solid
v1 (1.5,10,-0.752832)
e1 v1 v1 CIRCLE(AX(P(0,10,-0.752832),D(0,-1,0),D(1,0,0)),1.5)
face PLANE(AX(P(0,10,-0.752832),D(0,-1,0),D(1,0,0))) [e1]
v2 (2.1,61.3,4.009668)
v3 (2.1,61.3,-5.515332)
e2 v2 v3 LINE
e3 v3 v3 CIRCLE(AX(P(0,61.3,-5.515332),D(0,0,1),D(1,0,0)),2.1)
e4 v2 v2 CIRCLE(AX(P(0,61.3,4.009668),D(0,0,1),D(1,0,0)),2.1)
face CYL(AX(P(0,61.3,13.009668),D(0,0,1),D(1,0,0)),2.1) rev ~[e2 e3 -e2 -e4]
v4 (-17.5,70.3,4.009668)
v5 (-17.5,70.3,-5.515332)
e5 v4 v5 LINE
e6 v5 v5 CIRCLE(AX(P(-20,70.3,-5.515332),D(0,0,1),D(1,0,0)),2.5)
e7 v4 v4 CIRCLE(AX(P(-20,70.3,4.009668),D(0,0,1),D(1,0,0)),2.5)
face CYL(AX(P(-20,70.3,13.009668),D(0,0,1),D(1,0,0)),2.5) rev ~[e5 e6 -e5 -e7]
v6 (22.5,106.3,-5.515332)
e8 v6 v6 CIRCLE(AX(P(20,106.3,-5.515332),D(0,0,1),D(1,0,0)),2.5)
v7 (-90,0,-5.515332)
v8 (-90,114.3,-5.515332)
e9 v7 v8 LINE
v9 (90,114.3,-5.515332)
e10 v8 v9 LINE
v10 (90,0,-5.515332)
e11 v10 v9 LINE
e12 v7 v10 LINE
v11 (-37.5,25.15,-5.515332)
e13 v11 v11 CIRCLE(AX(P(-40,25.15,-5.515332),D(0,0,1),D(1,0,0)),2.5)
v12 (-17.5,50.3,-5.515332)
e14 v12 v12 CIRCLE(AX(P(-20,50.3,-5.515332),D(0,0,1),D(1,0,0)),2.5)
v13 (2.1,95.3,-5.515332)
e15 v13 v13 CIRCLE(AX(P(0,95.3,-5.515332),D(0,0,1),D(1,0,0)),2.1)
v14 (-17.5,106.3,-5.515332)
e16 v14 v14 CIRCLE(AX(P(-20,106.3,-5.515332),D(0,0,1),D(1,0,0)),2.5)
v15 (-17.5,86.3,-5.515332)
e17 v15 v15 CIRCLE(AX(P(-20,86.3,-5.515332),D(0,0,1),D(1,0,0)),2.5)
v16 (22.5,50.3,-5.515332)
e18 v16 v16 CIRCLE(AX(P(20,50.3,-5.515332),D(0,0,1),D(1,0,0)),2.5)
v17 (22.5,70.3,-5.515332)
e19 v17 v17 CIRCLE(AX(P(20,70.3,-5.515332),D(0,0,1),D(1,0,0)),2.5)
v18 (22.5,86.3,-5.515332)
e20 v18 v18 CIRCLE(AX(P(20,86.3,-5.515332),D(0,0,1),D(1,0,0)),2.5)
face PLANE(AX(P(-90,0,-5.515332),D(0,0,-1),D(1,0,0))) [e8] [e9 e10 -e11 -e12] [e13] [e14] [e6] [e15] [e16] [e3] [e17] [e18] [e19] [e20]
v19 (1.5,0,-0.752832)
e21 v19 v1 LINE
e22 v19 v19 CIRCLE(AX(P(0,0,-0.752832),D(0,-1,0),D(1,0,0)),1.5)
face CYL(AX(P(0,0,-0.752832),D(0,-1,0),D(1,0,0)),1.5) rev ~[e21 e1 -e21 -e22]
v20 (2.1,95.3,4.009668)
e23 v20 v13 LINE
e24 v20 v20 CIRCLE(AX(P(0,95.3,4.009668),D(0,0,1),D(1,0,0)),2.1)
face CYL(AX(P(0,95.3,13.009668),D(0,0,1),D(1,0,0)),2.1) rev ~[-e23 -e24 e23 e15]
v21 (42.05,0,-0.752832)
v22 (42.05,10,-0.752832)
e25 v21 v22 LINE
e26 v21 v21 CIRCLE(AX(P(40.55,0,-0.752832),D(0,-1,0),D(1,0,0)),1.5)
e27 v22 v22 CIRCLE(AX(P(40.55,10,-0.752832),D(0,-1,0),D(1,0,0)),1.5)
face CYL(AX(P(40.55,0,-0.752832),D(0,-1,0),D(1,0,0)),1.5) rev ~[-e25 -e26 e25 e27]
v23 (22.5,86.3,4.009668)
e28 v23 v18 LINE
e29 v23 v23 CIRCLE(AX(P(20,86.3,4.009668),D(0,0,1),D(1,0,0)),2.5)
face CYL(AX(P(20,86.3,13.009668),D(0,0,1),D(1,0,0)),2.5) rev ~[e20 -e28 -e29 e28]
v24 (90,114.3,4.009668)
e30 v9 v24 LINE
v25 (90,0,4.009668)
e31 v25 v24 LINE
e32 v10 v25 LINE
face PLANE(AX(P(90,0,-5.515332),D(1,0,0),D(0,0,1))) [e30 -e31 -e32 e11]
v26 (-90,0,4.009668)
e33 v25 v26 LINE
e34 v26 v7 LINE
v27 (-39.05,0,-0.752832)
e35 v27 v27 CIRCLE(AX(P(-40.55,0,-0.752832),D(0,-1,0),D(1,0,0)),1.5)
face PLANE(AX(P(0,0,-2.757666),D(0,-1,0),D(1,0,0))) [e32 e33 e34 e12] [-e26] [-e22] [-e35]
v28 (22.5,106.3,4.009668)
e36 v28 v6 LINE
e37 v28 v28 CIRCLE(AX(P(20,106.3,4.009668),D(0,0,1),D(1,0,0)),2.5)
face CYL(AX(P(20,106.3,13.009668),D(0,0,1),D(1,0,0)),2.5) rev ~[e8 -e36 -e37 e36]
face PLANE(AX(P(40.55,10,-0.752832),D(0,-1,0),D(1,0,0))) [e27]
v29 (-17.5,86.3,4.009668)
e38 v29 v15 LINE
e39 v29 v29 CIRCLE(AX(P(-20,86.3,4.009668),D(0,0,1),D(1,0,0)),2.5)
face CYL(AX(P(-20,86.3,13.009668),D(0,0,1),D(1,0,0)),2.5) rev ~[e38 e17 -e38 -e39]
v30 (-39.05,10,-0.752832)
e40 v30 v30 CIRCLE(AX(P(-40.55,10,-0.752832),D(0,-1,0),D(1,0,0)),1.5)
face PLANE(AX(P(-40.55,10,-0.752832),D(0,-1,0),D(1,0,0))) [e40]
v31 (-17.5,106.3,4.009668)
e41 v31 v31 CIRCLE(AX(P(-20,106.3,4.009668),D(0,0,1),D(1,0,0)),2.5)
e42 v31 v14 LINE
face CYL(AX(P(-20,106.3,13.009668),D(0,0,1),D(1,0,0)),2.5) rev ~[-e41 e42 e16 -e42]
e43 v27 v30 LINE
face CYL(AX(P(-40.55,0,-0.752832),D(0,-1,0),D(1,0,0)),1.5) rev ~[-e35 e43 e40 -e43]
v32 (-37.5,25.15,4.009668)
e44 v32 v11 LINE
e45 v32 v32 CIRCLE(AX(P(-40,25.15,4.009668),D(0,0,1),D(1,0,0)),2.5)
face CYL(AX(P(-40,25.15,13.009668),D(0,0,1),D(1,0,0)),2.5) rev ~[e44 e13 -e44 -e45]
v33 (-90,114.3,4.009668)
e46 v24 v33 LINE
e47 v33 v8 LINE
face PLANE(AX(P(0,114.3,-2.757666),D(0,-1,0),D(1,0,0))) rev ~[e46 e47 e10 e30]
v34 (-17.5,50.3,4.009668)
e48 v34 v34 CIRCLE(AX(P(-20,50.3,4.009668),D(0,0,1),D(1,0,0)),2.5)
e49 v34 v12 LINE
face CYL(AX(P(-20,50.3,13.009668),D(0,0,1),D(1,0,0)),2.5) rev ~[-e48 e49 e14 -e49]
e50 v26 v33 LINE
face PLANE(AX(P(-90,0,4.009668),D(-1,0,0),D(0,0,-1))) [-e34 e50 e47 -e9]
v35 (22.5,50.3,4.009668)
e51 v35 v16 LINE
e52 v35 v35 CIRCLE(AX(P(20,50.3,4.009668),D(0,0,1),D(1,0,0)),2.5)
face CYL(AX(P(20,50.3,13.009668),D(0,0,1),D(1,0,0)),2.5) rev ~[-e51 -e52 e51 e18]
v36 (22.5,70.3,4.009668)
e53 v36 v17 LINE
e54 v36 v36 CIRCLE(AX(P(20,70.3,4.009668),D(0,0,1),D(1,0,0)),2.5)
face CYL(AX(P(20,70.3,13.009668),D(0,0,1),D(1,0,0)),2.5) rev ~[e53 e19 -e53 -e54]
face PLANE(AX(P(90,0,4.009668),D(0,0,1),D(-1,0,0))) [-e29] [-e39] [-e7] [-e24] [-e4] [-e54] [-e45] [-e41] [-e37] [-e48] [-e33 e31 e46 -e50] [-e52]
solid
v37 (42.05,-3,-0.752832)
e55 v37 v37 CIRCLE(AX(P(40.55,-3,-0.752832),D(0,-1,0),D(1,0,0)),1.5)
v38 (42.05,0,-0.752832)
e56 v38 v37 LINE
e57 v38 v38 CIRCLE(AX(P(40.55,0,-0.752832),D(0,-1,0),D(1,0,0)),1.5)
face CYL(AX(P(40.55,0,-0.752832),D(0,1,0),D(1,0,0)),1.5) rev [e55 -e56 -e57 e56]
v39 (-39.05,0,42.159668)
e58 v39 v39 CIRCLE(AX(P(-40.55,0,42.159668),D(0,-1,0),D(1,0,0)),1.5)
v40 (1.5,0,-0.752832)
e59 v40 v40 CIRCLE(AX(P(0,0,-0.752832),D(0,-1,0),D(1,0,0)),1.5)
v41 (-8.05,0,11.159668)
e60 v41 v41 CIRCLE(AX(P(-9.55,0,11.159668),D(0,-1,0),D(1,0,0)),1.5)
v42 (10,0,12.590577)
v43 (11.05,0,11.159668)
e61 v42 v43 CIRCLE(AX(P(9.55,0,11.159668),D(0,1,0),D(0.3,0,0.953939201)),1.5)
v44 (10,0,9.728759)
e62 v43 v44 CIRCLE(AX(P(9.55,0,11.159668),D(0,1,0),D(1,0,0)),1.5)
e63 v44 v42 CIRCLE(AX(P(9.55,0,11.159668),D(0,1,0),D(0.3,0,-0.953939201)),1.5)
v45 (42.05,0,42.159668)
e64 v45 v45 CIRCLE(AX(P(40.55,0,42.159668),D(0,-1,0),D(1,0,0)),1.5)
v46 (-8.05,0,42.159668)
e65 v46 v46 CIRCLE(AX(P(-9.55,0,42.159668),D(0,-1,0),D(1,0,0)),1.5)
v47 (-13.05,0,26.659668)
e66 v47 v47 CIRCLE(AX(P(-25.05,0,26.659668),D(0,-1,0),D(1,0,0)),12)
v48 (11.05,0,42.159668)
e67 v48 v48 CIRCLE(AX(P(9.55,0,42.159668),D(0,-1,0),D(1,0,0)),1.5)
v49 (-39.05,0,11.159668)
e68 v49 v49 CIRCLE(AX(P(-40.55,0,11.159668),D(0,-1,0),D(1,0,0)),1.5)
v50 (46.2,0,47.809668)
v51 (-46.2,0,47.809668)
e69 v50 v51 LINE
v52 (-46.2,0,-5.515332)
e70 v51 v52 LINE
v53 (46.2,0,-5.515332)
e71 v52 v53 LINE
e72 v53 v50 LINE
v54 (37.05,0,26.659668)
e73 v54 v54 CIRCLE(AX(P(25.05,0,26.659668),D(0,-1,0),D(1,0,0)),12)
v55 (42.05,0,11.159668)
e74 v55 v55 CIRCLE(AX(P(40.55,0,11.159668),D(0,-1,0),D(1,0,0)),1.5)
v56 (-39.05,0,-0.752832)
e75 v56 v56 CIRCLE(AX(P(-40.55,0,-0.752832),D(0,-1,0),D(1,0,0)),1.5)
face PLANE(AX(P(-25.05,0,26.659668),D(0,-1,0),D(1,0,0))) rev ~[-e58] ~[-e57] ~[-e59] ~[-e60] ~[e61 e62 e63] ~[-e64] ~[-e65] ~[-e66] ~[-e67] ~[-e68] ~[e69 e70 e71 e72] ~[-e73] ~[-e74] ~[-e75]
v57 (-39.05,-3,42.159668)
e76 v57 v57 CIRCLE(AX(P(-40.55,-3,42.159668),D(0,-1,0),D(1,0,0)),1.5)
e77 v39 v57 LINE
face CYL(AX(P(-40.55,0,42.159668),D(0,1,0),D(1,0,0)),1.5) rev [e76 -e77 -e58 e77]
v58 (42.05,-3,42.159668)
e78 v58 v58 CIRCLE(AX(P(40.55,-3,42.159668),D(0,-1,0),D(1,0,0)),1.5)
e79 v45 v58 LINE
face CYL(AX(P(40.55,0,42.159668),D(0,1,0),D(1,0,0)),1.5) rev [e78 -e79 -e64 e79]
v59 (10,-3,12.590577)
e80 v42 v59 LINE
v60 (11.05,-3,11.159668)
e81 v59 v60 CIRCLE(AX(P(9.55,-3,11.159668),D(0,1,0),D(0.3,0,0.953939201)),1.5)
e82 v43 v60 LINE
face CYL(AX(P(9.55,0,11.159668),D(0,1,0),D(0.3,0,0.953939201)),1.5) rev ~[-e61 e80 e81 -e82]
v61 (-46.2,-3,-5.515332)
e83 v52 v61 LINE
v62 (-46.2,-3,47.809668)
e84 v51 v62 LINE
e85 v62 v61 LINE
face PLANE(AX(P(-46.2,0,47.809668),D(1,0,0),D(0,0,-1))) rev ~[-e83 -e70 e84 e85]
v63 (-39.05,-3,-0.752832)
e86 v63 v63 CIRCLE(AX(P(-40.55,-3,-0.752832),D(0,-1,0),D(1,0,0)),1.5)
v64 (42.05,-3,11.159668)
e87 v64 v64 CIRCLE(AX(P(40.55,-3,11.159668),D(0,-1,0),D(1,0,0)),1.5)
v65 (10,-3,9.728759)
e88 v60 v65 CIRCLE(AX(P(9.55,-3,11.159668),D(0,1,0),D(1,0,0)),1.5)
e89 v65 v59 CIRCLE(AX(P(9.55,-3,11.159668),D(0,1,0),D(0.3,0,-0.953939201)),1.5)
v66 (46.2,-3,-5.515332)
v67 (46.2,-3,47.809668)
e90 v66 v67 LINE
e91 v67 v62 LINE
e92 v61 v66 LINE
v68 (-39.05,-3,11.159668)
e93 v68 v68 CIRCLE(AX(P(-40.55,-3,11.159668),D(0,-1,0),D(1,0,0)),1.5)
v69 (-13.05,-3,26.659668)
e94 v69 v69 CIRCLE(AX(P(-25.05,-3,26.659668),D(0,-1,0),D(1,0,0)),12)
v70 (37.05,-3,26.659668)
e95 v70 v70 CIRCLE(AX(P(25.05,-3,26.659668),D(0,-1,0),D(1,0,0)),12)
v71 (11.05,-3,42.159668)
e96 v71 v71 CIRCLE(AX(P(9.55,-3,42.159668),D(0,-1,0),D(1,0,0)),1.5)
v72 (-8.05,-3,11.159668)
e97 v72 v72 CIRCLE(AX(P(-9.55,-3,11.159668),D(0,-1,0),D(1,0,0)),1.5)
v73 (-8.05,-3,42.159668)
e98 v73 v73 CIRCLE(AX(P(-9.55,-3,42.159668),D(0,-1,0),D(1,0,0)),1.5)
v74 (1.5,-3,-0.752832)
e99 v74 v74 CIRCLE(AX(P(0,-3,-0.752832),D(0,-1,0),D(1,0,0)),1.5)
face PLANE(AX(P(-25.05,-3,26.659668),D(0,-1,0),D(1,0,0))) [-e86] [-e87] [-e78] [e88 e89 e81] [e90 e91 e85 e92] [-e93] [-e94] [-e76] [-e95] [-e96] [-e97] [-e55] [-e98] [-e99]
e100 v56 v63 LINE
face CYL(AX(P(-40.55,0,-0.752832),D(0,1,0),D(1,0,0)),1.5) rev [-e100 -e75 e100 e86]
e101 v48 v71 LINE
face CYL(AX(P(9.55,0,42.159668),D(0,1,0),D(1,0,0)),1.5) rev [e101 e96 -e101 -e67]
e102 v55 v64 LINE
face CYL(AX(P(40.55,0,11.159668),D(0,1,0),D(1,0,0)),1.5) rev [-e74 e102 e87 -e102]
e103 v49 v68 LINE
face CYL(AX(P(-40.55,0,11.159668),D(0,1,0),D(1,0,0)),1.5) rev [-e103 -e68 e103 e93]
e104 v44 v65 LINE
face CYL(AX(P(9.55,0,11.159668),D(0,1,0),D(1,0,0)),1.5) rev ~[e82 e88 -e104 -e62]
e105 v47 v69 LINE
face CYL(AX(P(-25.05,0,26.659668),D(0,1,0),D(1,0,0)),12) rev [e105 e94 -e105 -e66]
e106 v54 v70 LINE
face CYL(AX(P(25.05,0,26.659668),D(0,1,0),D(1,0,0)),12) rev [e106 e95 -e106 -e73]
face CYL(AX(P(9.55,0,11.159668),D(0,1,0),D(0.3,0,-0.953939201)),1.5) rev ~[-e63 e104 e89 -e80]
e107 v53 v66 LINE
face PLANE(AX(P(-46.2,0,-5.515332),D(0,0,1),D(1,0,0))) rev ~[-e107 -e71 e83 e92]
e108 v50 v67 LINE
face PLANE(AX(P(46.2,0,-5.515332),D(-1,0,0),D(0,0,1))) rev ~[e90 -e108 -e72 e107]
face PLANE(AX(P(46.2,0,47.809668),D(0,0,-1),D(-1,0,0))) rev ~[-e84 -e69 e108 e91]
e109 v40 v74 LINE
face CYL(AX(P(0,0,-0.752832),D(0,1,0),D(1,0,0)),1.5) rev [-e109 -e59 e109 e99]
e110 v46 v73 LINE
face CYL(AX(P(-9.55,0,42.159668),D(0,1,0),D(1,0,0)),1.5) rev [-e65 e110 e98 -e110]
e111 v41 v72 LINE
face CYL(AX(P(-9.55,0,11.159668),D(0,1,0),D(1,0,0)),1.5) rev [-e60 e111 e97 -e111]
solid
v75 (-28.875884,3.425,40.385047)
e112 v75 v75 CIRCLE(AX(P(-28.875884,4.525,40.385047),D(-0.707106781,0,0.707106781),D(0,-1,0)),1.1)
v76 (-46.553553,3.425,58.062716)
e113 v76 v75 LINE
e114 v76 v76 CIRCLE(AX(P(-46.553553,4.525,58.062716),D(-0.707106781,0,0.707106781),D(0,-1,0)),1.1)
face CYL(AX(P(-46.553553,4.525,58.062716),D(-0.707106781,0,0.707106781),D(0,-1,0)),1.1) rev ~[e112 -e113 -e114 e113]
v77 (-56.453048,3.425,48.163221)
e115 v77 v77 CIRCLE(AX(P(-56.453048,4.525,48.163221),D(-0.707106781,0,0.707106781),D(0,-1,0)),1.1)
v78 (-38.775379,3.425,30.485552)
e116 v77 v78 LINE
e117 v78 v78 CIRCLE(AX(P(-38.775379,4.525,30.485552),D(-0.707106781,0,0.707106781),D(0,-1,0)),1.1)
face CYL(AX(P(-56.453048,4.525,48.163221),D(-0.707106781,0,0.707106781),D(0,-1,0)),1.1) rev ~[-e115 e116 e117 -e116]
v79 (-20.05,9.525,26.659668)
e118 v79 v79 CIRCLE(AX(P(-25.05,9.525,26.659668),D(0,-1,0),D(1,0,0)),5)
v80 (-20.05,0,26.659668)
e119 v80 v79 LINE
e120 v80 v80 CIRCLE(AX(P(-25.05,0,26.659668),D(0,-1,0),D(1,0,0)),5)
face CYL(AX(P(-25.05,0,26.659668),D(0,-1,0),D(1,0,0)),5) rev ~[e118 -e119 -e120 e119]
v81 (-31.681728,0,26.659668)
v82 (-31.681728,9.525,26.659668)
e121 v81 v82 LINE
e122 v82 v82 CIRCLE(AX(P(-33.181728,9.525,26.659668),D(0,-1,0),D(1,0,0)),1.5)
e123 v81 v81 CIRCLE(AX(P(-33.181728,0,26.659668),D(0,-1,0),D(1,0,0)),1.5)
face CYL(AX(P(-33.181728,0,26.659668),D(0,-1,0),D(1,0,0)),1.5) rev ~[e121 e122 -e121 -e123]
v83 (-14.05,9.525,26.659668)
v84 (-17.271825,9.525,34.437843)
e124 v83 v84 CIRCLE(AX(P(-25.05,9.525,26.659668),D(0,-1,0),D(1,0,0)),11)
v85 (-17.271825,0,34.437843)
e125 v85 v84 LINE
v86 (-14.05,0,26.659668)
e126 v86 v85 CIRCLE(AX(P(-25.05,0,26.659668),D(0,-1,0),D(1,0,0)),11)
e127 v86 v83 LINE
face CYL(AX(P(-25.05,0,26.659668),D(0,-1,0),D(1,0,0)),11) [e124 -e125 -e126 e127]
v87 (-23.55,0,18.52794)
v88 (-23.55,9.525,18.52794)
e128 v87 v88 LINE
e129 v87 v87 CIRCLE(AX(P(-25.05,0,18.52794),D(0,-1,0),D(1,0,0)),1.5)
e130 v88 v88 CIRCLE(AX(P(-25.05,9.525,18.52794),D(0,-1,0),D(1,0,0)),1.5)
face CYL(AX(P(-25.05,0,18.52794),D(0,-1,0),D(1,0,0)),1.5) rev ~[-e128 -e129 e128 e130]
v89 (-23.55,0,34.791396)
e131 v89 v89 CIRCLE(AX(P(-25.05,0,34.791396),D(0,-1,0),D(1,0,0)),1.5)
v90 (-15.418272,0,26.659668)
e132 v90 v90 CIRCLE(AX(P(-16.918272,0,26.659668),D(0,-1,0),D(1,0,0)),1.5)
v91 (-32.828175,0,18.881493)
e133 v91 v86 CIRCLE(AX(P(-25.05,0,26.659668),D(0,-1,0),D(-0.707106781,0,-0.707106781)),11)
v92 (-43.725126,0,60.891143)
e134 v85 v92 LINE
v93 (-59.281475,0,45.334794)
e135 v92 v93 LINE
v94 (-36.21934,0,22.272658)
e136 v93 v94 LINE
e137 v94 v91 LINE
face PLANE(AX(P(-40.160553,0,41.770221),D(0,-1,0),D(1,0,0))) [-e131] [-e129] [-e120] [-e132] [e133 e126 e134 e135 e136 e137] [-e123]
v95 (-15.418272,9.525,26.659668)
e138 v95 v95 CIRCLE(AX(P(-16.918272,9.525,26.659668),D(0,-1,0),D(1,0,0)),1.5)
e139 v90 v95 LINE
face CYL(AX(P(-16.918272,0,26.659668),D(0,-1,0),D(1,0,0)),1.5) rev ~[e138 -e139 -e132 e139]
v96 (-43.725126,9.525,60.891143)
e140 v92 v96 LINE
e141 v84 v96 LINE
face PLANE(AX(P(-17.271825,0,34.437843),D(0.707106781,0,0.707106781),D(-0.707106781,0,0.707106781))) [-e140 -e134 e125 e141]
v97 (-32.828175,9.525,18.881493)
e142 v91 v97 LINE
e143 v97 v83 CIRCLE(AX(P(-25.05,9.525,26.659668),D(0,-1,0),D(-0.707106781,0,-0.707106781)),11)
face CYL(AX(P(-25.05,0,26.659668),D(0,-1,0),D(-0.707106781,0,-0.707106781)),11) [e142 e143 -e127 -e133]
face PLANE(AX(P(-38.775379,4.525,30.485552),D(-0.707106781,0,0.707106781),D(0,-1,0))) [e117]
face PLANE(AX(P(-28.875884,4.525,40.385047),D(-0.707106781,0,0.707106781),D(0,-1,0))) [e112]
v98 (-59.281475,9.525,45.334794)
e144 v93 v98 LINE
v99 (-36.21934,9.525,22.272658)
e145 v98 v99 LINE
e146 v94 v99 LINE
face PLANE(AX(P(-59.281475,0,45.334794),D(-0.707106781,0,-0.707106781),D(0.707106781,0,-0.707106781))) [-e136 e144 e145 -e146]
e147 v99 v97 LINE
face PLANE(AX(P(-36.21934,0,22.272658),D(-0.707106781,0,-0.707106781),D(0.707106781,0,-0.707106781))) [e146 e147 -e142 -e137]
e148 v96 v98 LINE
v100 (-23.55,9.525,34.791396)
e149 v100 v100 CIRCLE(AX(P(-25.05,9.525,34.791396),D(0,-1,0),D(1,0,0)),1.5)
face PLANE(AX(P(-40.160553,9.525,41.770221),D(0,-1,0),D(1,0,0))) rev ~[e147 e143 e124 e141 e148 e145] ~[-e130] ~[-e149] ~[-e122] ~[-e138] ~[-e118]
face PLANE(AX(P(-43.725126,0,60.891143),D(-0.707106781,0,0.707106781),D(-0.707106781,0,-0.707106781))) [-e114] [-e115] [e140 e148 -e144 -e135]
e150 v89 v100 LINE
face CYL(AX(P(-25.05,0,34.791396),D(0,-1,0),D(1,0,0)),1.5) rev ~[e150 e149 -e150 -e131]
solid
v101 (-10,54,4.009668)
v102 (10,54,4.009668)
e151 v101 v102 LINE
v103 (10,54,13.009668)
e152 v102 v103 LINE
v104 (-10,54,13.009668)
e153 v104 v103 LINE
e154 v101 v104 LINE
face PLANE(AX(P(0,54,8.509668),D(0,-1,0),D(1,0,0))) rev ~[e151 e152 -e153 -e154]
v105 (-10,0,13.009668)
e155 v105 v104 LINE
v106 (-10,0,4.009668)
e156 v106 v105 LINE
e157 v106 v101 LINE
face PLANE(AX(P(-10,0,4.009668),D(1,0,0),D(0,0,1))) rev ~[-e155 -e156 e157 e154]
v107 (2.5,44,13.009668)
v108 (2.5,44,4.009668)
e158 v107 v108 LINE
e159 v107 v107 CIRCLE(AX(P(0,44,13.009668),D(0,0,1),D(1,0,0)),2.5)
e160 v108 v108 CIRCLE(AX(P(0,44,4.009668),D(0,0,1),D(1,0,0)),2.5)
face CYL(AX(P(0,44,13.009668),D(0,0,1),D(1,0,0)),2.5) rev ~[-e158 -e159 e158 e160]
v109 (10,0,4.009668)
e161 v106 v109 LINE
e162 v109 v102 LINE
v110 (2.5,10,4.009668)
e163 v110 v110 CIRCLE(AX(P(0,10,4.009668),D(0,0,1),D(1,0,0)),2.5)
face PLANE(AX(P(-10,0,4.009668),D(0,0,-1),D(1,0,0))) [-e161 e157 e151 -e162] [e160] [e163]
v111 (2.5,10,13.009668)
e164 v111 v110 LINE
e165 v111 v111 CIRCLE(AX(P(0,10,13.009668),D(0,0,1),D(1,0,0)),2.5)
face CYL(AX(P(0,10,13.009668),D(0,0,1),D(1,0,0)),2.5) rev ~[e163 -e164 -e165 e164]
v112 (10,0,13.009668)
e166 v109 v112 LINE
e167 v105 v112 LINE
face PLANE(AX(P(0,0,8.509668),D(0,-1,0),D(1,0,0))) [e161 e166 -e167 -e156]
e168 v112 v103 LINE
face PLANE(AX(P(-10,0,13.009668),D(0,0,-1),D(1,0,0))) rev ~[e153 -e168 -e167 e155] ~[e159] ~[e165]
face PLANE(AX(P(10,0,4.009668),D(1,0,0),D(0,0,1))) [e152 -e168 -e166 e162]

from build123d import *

# Parameters (mm, degrees)
F0_W      = 20
F0_H      = 9
F1_DEPTH  = 54
F0_W_2    = 180
F0_H_2    = 5.5153320081
F2_DEPTH  = 114.3
F3_R      = 2.5
F3_R_2    = 2.1
F4_DEPTH  = 25
F6_R      = 1.5
F6_R_2    = 5
F7_DEPTH  = 9.525
F5_W      = 42.3
F5_H      = 42.3
F5_R      = 1.5
F5_R_2    = 12
F5_W_2    = 7.8
F8_DEPTH  = 3
F9_DEPTH  = 10
F10_R     = 2.5
F11_DEPTH = 9
F13_R     = 1.1
F14_DEPTH = 25


# Not quite as in the source:
# - a feature names something its author has since deleted; it is built from what else it names


with BuildPart() as f1:
    # F0 (on Front) → F1 (new body)
    with BuildSketch(Plane.XZ):
        with Locations((0, 8.5096679919)):
            Rectangle(F0_W, F0_H)
    extrude(amount=-F1_DEPTH)

    # F10 (on face) → F11 (cut, through all)
    with BuildSketch(Plane.XY.offset(13.0096679919)):
        with Locations((0, 44)):
            Circle(F10_R)
        with Locations((0, 10)):
            Circle(F10_R)
    extrude(amount=-F11_DEPTH, mode=Mode.SUBTRACT)


with BuildPart() as f2:
    # F0 (on Front) → F2 (new body)
    with BuildSketch(Plane.XZ):
        with Locations((0, -2.7576660041)):
            Rectangle(F0_W_2, F0_H_2)
        Polygon((-90, 4.0096679919), (-90, 0), (90, 0), (90, 4.0096679919), (10, 4.0096679919), (-10, 4.0096679919), align=None)
    extrude(amount=-F2_DEPTH)

    # F3 (on face) → F4 (cut)
    with BuildSketch(Plane.XY.offset(13.0096679919)):
        with Locations((-20, 50.3)):
            Circle(F3_R)
        with Locations((20, 50.3)):
            Circle(F3_R)
        with Locations((-20, 70.3)):
            Circle(F3_R)
        with Locations((-20, 86.3)):
            Circle(F3_R)
        with Locations((-20, 106.3)):
            Circle(F3_R)
        with Locations((20, 106.3)):
            Circle(F3_R)
        with Locations((20, 86.3)):
            Circle(F3_R)
        with Locations((20, 70.3)):
            Circle(F3_R)
        with Locations((-40, 25.15)):
            Circle(F3_R)
        with Locations((0, 95.3)):
            Circle(F3_R_2)
        with Locations((0, 61.3)):
            Circle(F3_R_2)
    extrude(amount=-F4_DEPTH, mode=Mode.SUBTRACT)

    # F5 (on Front) → F9 (cut)
    with BuildSketch(Plane.XZ):
        with Locations((-40.55, -0.7528320081)):
            Circle(F5_R)
        with Locations((0, -0.7528320081)):
            Circle(F5_R)
        with Locations((40.55, -0.7528320081)):
            Circle(F5_R)
    extrude(amount=-F9_DEPTH, mode=Mode.SUBTRACT)


with BuildPart() as f7:
    # F6 (on Front) → F7 (new body)
    with BuildSketch(Plane.XZ):
        with BuildLine():
            ThreePointArc((-36.2193395846, 22.2726583904), (-33.5352813742, 35.1449493661), (-20.6629903985, 37.8290075765))
            Line((-20.6629903985, 37.8290075765), (-43.7251262658, 60.8911434438))
            Line((-43.7251262658, 60.8911434438), (-59.281475452, 45.3347942577))
            Line((-59.281475452, 45.3347942577), (-36.2193395846, 22.2726583904))
        make_face()
        with BuildLine():
            Line((-17.2718254069, 34.4378425849), (-20.6629903985, 37.8290075765))
            ThreePointArc((-20.6629903985, 37.8290075765), (-33.5352813742, 35.1449493661), (-36.2193395846, 22.2726583904))
            Line((-36.2193395846, 22.2726583904), (-32.8281745931, 18.8814933988))
            ThreePointArc((-32.8281745931, 18.8814933988), (-32.8281745931, 34.4378425849), (-17.2718254069, 34.4378425849))
        make_face()
        with BuildLine():
            ThreePointArc((-14.05, 26.6596679919), (-14.8873251424, 30.8691857479), (-17.2718254069, 34.4378425849))
            ThreePointArc((-17.2718254069, 34.4378425849), (-32.8281745931, 34.4378425849), (-32.8281745931, 18.8814933988))
            ThreePointArc((-32.8281745931, 18.8814933988), (-20.840482244, 16.4969931343), (-14.05, 26.6596679919))
        make_face()
        with Locations((-25.05, 18.5279400082)):
            Circle(F6_R, mode=Mode.SUBTRACT)
        with Locations((-33.1817279836, 26.6596679919)):
            Circle(F6_R, mode=Mode.SUBTRACT)
        with Locations((-25.05, 26.6596679919)):
            Circle(F6_R_2, mode=Mode.SUBTRACT)
        with Locations((-25.05, 34.7913959755)):
            Circle(F6_R, mode=Mode.SUBTRACT)
        with Locations((-16.9182720164, 26.6596679919)):
            Circle(F6_R, mode=Mode.SUBTRACT)
    extrude(amount=-F7_DEPTH)

    # F13 (on face) → F14 (cut)
    with BuildSketch(Plane(origin=(-52.3081348548, 0, 52.3081348548), x_dir=(0, -1, 0), z_dir=(-0.7071067812, 0, 0.7071067812))):
        with Locations((-4.525, -5.8617928475)):
            Circle(F13_R)
        with Locations((-4.525, 8.1382071525)):
            Circle(F13_R)
    extrude(amount=-F14_DEPTH, mode=Mode.SUBTRACT)


with BuildPart() as f8:
    # F5 (on Front) → F8 (new body)
    with BuildSketch(Plane.XZ):
        with Locations((-25.05, 26.6596679919)):
            Rectangle(F5_W, F5_H)
        with Locations((-40.55, 11.1596679919)):
            Circle(F5_R, mode=Mode.SUBTRACT)
        with Locations((-9.55, 11.1596679919)):
            Circle(F5_R, mode=Mode.SUBTRACT)
        with Locations((-25.05, 26.6596679919)):
            Circle(F5_R_2, mode=Mode.SUBTRACT)
        with Locations((-40.55, 42.1596679919)):
            Circle(F5_R, mode=Mode.SUBTRACT)
        with Locations((-9.55, 42.1596679919)):
            Circle(F5_R, mode=Mode.SUBTRACT)
        Polygon((46.2, 47.8096679919), (3.9, 47.8096679919), (3.9, 5.5096679919), (10, 5.5096679919), (46.2, 5.5096679919), align=None)
        with BuildLine():
            ThreePointArc((11.05, 11.1596679919), (10.7593386622, 10.2722560244), (10, 9.7287591898))
            ThreePointArc((10, 9.7287591898), (8.05, 11.1596679919), (10, 12.590576794))
            ThreePointArc((10, 12.590576794), (10.7593386622, 12.0470799593), (11.05, 11.1596679919))
        make_face(mode=Mode.SUBTRACT)
        with Locations((40.55, 11.1596679919)):
            Circle(F5_R, mode=Mode.SUBTRACT)
        with Locations((25.05, 26.6596679919)):
            Circle(F5_R_2, mode=Mode.SUBTRACT)
        with Locations((9.55, 42.1596679919)):
            Circle(F5_R, mode=Mode.SUBTRACT)
        with Locations((40.55, 42.1596679919)):
            Circle(F5_R, mode=Mode.SUBTRACT)
        with Locations((0, 26.6596679919)):
            Rectangle(F5_W_2, F5_H)
        Polygon((3.9, 5.5096679919), (-3.9, 5.5096679919), (-46.2, 5.5096679919), (-46.2, -5.5153320081), (46.2, -5.5153320081), (46.2, 5.5096679919), (10, 5.5096679919), align=None)
        with Locations((-40.55, -0.7528320081)):
            Circle(F5_R, mode=Mode.SUBTRACT)
        with Locations((0, -0.7528320081)):
            Circle(F5_R, mode=Mode.SUBTRACT)
        with Locations((40.55, -0.7528320081)):
            Circle(F5_R, mode=Mode.SUBTRACT)
    extrude(amount=F8_DEPTH)


solid = Compound([f1.part, f2.part, f7.part, f8.part])
